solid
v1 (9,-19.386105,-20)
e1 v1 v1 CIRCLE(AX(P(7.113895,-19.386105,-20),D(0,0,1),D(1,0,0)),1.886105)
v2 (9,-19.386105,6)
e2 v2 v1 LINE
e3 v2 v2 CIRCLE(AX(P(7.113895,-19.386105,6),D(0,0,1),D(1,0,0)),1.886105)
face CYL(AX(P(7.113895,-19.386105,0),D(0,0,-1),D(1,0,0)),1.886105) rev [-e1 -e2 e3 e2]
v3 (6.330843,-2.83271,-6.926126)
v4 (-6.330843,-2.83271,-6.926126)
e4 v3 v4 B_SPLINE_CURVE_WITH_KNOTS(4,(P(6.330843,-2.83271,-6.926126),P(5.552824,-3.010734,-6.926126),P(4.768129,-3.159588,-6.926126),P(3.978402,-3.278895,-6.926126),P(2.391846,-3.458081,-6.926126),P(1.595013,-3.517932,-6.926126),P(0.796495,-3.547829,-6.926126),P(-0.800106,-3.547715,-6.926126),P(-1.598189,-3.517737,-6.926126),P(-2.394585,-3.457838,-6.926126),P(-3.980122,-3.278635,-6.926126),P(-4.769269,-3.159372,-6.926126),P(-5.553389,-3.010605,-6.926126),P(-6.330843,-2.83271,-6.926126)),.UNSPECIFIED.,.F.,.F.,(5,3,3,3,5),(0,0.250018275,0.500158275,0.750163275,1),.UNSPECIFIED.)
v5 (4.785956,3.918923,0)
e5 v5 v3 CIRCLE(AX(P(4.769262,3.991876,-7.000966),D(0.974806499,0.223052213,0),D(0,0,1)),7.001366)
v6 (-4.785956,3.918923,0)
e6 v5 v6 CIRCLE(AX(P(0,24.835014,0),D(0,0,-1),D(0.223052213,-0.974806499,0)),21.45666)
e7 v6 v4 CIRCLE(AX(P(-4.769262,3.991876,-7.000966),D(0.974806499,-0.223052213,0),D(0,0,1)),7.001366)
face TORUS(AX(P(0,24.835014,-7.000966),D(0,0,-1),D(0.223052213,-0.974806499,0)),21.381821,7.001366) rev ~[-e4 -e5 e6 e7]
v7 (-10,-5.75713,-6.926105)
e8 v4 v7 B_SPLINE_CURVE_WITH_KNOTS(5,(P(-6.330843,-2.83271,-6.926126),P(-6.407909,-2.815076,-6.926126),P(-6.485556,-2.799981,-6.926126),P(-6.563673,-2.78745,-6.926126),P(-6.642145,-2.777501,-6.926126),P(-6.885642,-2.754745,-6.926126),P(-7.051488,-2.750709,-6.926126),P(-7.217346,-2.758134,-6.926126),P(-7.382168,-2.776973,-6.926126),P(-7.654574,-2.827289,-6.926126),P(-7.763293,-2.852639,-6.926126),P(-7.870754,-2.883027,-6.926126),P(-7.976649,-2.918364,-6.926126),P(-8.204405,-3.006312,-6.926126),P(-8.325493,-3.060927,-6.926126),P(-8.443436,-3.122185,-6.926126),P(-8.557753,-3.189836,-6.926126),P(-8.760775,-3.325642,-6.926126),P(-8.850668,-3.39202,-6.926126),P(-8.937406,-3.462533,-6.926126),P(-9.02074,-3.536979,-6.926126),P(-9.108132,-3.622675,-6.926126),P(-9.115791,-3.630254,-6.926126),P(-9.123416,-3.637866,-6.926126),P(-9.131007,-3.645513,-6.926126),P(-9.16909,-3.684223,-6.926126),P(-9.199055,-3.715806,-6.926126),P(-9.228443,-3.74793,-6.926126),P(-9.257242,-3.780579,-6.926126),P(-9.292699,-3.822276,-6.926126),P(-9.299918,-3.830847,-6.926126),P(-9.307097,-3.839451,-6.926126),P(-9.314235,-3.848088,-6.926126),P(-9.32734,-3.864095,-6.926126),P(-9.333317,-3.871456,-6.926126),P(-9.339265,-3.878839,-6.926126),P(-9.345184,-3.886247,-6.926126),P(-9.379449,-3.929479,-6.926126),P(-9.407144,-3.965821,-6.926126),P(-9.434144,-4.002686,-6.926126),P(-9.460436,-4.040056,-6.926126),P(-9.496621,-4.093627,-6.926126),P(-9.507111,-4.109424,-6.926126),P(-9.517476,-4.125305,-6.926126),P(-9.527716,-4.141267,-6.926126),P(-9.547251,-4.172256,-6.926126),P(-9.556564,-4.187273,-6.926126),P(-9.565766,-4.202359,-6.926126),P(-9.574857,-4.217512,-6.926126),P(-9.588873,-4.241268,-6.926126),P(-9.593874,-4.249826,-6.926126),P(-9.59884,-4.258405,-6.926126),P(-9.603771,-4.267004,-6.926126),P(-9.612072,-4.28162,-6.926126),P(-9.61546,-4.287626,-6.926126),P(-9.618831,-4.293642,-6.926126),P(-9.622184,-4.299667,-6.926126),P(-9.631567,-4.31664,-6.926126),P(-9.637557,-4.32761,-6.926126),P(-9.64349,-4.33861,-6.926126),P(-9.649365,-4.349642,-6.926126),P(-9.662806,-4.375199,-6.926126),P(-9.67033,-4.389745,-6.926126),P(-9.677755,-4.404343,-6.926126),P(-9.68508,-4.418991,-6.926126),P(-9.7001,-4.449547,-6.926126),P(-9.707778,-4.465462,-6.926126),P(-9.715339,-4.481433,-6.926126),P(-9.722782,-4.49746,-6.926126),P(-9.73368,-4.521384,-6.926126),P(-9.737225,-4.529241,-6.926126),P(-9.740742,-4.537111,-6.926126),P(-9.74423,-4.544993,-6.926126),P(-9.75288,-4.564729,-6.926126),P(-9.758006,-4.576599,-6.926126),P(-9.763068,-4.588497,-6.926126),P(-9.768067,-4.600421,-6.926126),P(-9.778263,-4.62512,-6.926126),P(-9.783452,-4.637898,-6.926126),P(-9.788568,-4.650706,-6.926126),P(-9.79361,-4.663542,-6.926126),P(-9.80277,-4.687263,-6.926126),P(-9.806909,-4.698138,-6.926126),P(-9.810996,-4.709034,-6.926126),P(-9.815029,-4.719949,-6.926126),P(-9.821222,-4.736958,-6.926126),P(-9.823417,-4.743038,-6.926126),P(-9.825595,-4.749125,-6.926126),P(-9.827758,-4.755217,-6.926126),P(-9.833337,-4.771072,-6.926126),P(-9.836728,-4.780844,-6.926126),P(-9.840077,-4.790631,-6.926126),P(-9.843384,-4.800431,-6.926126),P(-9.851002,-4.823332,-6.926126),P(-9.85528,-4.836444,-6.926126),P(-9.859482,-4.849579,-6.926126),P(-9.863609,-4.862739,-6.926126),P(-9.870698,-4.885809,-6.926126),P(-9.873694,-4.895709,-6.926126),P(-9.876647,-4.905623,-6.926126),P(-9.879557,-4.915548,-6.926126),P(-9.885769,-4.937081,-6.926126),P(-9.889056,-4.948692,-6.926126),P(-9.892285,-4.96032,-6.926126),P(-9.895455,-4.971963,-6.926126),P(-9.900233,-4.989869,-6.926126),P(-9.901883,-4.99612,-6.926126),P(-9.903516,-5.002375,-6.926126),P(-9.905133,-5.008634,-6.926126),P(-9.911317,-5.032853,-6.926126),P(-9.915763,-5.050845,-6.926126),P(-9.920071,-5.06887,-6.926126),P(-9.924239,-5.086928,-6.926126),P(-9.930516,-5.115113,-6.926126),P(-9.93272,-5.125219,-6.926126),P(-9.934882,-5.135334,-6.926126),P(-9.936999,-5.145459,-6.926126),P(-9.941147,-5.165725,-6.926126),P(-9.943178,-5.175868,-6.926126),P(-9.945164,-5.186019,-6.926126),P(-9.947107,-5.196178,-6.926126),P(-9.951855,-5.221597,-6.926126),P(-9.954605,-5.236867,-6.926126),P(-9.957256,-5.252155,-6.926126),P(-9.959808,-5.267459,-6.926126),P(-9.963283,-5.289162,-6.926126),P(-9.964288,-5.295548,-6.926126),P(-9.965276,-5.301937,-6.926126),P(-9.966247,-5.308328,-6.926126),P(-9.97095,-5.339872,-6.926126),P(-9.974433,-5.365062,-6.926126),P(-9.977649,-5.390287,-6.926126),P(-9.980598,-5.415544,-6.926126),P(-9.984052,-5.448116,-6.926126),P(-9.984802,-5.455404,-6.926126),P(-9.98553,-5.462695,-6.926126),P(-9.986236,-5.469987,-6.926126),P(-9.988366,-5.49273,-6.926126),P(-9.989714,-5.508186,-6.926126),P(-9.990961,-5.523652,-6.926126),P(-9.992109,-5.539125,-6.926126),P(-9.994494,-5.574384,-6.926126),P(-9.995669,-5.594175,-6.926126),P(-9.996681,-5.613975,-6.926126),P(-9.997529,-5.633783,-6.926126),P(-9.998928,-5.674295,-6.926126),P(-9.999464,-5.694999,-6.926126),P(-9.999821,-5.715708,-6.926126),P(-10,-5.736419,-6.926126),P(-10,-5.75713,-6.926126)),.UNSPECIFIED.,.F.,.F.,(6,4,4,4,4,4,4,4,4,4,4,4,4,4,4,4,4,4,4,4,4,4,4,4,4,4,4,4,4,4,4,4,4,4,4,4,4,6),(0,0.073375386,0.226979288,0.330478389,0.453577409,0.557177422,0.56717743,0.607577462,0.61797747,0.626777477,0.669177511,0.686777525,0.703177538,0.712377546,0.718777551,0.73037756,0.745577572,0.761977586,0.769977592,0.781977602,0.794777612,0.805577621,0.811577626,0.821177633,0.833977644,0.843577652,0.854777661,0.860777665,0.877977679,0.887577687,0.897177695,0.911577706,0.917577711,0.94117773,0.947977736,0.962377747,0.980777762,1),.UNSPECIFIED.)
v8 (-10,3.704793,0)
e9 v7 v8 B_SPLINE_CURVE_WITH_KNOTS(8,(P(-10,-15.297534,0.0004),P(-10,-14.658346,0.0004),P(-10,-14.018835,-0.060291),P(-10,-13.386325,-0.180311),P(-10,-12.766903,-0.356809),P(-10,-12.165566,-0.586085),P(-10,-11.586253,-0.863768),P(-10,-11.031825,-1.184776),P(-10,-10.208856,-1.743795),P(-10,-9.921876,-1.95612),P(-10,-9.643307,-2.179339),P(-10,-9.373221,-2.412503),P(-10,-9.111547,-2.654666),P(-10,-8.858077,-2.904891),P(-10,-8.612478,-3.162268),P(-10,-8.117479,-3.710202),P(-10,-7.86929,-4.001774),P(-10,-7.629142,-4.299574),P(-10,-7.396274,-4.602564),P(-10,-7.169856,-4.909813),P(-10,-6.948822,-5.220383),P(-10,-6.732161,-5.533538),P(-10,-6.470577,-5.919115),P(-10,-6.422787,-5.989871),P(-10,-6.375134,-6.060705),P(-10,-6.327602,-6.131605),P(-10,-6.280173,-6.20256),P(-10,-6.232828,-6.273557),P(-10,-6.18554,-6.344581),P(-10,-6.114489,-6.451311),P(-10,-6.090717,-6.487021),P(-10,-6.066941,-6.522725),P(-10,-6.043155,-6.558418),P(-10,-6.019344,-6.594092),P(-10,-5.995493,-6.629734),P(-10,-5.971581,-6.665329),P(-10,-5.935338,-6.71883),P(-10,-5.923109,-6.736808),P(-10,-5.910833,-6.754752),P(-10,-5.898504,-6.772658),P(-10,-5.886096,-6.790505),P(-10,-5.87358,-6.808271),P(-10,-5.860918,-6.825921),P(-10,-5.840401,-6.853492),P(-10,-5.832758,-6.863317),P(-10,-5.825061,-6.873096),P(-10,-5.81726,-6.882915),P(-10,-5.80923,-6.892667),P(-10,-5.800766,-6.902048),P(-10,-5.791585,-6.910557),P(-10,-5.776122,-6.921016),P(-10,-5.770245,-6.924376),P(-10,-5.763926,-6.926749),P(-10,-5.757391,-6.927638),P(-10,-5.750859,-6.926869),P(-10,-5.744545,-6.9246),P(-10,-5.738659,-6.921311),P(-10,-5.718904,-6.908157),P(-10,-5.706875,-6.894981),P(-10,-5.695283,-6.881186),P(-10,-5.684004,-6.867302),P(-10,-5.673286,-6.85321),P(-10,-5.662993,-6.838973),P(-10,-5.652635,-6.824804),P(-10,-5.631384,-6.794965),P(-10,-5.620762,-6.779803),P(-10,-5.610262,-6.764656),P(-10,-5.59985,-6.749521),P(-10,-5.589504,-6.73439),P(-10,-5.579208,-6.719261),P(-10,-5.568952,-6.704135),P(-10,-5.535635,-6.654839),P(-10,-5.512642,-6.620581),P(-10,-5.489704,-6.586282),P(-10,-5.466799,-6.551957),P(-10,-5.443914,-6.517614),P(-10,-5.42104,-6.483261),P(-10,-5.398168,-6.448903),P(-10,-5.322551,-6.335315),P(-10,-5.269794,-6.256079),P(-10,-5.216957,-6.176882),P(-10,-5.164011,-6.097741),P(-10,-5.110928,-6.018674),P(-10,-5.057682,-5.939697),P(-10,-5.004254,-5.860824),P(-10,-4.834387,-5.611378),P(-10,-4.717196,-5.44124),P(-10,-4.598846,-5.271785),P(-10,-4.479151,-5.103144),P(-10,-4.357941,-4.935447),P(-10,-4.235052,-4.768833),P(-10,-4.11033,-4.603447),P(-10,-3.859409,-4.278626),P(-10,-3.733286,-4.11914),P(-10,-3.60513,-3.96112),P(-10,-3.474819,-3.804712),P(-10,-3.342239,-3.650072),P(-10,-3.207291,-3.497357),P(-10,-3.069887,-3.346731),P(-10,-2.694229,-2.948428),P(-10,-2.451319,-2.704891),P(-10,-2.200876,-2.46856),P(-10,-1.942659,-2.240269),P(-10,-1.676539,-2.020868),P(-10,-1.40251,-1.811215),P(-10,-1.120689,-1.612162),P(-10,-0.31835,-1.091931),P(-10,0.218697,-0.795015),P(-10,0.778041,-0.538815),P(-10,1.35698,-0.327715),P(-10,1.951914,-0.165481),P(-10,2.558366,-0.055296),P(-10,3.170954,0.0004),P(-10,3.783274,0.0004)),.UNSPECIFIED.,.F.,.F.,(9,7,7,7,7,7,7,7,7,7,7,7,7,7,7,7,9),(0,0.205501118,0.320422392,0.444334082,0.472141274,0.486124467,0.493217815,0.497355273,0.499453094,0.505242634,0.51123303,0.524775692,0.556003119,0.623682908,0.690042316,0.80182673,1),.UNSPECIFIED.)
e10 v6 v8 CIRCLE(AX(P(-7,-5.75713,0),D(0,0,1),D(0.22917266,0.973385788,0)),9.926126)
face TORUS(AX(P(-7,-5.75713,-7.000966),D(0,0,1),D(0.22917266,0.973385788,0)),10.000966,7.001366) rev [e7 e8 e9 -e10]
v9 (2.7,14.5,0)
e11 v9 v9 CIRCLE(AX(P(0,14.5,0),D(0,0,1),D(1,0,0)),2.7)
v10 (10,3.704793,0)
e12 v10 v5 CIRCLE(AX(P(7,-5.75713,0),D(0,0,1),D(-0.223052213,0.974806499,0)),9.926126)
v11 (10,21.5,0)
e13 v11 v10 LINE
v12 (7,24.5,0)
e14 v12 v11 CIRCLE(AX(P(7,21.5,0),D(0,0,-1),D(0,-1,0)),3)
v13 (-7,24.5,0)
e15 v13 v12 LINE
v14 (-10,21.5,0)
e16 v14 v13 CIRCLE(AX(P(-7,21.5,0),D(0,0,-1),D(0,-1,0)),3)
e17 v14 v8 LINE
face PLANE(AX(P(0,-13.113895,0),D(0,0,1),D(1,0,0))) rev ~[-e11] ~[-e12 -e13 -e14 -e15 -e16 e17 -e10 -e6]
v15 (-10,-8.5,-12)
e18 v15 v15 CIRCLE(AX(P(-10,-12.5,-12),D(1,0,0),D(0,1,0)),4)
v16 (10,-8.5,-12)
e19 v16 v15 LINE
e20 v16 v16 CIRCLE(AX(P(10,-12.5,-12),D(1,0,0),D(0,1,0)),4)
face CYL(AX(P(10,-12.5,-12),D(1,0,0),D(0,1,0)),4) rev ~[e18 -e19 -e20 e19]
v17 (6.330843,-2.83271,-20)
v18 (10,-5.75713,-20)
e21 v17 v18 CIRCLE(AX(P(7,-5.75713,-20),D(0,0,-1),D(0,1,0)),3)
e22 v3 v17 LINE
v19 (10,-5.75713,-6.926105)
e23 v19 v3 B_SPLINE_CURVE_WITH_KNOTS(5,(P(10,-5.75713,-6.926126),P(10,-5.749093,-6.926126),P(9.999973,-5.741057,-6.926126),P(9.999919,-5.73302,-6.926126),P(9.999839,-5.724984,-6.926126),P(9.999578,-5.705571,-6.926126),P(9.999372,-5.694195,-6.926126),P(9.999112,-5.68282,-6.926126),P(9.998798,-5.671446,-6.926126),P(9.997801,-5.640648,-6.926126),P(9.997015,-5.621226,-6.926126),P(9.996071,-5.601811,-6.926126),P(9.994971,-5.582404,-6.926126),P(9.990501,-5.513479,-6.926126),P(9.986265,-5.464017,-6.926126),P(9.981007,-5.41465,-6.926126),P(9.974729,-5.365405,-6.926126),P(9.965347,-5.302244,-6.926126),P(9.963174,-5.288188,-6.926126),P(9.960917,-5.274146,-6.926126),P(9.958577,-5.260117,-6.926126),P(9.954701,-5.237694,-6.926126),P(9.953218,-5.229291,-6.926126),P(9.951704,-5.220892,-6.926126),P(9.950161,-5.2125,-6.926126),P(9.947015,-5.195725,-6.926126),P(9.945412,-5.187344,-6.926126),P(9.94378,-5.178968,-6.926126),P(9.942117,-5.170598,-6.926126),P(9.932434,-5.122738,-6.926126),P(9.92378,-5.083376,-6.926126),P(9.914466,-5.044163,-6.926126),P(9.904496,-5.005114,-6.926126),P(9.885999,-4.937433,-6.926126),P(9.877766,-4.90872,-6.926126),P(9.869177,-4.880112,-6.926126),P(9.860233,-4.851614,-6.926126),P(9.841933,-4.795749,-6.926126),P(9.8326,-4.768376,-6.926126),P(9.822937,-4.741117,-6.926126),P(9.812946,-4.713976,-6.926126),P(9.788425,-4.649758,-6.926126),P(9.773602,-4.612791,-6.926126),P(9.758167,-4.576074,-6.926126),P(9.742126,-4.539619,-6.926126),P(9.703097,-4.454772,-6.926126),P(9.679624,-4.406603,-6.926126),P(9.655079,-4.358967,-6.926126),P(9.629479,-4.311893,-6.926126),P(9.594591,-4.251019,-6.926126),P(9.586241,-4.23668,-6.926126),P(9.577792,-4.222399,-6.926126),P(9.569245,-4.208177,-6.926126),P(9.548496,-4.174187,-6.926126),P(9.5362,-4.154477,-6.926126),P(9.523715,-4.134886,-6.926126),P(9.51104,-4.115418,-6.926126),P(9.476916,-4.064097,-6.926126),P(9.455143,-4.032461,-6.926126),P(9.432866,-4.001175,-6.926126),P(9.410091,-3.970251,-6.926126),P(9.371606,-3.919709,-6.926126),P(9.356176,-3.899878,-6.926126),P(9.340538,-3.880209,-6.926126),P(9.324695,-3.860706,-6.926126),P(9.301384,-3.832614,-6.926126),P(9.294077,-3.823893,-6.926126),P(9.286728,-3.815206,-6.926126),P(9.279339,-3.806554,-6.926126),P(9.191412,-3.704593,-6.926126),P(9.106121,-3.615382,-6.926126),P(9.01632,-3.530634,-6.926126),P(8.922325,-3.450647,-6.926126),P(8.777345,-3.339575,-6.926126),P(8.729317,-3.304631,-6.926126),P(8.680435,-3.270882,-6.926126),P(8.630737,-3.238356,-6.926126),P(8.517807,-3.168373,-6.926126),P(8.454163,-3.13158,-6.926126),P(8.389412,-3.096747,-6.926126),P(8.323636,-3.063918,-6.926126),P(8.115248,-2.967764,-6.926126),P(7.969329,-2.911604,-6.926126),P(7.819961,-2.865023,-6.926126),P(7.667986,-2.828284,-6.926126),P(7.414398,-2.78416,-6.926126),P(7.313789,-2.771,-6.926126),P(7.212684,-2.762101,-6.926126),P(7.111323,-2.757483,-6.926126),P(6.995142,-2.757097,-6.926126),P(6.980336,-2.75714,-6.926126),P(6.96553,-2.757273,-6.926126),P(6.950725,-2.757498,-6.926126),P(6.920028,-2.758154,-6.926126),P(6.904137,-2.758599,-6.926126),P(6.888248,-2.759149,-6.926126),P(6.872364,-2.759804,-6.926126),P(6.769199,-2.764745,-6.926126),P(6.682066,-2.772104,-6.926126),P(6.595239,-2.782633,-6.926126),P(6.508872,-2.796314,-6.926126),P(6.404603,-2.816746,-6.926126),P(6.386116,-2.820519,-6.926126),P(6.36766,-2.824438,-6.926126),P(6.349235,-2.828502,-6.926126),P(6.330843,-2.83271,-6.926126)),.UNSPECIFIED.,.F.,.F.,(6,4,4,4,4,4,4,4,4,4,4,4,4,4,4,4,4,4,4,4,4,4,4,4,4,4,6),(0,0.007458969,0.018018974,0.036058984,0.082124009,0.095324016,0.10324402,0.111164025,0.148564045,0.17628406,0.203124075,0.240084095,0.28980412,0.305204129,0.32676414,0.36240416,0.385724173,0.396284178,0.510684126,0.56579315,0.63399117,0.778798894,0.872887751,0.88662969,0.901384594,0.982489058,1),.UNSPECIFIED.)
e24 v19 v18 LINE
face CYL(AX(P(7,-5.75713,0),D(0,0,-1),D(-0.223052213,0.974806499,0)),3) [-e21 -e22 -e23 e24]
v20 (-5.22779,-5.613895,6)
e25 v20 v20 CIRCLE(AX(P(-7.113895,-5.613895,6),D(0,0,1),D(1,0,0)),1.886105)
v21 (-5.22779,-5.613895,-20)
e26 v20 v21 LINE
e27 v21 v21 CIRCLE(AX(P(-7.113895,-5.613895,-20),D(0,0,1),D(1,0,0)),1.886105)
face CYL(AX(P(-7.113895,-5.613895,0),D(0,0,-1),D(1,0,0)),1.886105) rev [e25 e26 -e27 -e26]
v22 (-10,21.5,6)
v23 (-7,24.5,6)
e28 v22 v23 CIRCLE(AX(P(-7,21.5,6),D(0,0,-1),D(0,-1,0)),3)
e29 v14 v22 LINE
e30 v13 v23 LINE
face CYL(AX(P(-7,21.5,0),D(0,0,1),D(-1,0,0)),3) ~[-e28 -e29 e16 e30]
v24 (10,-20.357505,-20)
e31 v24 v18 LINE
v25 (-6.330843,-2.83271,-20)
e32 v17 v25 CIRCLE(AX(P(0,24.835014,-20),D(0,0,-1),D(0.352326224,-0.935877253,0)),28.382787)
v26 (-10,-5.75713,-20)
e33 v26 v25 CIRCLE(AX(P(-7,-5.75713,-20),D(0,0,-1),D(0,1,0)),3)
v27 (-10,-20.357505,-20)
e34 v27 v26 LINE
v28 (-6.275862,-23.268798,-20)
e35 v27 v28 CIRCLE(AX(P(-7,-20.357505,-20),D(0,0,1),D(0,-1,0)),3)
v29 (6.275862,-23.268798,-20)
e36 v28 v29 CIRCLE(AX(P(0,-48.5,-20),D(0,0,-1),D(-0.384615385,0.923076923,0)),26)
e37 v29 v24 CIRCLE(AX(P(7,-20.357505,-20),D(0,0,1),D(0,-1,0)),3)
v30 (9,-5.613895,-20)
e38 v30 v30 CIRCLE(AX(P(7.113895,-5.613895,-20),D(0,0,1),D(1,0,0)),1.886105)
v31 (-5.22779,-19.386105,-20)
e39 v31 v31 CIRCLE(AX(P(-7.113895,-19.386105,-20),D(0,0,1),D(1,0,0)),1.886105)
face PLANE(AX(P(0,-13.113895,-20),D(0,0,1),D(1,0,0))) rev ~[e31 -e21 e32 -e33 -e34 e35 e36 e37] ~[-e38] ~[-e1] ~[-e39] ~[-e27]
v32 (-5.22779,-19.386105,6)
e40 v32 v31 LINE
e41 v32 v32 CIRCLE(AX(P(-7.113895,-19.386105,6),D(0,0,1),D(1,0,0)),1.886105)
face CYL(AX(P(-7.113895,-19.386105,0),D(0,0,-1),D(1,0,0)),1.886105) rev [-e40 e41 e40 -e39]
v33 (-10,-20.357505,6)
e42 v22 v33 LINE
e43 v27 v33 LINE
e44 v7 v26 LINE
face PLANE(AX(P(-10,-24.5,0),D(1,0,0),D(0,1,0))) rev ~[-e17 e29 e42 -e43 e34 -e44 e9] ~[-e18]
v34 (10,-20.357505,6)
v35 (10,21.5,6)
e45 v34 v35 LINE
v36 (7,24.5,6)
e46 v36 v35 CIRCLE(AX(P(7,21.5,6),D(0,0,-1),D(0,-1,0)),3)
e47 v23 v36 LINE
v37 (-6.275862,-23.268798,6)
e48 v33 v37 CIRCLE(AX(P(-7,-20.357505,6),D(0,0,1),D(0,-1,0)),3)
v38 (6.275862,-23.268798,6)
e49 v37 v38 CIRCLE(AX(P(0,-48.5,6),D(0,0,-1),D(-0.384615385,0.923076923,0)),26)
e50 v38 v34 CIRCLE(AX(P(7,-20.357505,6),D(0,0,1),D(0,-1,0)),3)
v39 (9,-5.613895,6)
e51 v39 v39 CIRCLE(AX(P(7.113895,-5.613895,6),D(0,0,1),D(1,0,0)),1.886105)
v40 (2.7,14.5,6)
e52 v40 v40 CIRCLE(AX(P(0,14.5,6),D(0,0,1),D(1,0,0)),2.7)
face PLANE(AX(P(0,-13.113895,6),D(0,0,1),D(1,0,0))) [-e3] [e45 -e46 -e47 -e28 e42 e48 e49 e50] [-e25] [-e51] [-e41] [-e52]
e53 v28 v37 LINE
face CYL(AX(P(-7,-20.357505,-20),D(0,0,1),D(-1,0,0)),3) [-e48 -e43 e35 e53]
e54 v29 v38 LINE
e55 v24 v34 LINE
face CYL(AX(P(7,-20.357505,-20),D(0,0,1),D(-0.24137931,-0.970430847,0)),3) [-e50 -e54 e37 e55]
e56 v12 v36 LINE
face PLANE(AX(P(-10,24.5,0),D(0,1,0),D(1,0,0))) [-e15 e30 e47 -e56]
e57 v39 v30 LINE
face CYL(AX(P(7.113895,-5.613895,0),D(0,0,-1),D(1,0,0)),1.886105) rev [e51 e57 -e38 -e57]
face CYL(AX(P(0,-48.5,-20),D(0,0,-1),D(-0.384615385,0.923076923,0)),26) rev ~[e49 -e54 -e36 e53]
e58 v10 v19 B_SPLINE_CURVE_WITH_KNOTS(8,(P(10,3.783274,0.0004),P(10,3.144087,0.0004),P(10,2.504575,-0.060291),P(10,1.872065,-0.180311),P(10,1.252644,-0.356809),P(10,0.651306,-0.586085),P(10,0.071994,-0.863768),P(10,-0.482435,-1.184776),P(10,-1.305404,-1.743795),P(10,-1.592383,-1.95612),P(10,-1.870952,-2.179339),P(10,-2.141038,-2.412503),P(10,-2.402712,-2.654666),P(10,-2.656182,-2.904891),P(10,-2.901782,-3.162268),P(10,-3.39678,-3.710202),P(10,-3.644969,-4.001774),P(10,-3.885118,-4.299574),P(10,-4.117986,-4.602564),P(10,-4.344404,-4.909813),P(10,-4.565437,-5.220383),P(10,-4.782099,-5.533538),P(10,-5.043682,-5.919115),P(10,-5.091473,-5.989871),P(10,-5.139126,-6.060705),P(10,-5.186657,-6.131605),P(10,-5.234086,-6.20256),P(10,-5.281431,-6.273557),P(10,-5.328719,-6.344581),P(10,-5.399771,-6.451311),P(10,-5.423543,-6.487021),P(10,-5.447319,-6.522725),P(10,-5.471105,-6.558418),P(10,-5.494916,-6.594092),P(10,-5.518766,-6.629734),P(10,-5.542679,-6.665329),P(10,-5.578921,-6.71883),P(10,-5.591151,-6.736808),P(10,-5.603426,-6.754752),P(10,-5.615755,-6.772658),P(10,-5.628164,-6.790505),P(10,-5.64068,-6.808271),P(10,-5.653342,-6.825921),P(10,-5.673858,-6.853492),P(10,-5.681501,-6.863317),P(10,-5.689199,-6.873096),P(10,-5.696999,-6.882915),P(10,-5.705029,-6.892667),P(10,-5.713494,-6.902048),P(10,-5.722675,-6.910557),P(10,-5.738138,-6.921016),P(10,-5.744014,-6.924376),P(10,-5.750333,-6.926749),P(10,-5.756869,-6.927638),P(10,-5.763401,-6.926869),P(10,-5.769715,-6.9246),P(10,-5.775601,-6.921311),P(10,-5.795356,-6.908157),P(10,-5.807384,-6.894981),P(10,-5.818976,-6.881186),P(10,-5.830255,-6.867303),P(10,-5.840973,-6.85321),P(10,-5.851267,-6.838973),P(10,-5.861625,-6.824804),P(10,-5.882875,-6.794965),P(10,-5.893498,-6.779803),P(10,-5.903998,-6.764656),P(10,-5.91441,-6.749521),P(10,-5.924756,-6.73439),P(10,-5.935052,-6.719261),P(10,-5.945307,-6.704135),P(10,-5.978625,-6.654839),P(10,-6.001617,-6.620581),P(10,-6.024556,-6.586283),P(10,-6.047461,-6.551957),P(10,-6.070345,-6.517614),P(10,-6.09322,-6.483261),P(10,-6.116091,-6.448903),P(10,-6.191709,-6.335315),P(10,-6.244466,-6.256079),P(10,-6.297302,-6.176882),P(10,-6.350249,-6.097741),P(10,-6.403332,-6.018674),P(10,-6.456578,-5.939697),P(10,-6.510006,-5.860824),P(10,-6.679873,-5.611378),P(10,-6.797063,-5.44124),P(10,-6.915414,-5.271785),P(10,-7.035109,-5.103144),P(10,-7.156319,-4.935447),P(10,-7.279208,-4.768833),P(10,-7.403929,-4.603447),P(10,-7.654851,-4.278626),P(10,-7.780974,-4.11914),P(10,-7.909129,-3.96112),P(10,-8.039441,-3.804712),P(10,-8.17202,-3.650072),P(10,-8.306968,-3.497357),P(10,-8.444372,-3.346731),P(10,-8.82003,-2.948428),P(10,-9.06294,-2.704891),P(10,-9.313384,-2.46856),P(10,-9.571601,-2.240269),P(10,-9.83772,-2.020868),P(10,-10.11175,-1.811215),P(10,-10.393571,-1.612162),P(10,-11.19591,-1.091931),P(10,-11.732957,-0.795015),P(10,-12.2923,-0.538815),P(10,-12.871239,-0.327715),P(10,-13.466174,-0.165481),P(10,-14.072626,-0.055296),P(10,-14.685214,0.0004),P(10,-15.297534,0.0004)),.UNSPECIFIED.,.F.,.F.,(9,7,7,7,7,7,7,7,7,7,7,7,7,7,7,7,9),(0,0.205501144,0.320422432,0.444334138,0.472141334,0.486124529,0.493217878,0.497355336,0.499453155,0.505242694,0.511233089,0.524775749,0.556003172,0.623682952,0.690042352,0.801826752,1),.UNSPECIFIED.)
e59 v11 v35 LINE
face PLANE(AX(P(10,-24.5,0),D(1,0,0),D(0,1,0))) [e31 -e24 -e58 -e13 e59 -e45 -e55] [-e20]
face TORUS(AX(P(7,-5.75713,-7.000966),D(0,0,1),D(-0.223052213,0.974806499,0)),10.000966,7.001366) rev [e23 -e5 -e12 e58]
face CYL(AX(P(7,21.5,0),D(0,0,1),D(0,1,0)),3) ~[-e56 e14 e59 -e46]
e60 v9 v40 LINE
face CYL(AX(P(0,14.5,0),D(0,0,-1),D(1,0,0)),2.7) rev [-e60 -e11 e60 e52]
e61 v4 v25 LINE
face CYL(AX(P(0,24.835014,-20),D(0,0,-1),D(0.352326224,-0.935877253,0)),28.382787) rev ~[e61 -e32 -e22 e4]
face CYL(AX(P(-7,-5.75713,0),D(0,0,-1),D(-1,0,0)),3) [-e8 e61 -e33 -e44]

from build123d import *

# Parameters (mm, degrees)
F0_W         = 20
F0_H         = 22.7722101178
F0_R         = 1.8861050589
F0_H_2       = 26.2277898822
F0_R_2       = 2.7
F1_DEPTH     = 6
F2_DEPTH     = 20
F3_R         = 4
F4_DEPTH     = 25
F6_DEPTH     = 20
F7_DEPTH     = 26.001
F8_R         = 3
F9_T2_ANGLE  = 25.7767353783
F9_T6_ANGLE  = 359.64
F9_T11_ANGLE = 359.64


# Not quite as in the source:
# - a fillet or chamfer that OpenCascade refuses, or shapes differently, is made with other operations: its cross-section is extruded or revolved along the edge and cut away or added


with BuildPart() as f1:
    # F0 (on Top) → F1 (new body)
    with BuildSketch(Plane.XY):
        with Locations((0, -13.1138949411)):
            Rectangle(F0_W, F0_H)
        with Locations((-7.1138949411, -19.3861050589)):
            Circle(F0_R, mode=Mode.SUBTRACT)
        with Locations((-7.1138949411, -5.6138949411)):
            Circle(F0_R, mode=Mode.SUBTRACT)
        with Locations((7.1138949411, -19.3861050589)):
            Circle(F0_R, mode=Mode.SUBTRACT)
        with Locations((7.1138949411, -5.6138949411)):
            Circle(F0_R, mode=Mode.SUBTRACT)
        with Locations((0, 11.3861050589)):
            Rectangle(F0_W, F0_H_2)
        with Locations((0, 14.5)):
            Circle(F0_R_2, mode=Mode.SUBTRACT)
    extrude(amount=F1_DEPTH)

    # F0 (on Top) → F2 (join)
    with BuildSketch(Plane.XY):
        with Locations((0, -13.1138949411)):
            Rectangle(F0_W, F0_H)
        with Locations((-7.1138949411, -19.3861050589)):
            Circle(F0_R, mode=Mode.SUBTRACT)
        with Locations((-7.1138949411, -5.6138949411)):
            Circle(F0_R, mode=Mode.SUBTRACT)
        with Locations((7.1138949411, -19.3861050589)):
            Circle(F0_R, mode=Mode.SUBTRACT)
        with Locations((7.1138949411, -5.6138949411)):
            Circle(F0_R, mode=Mode.SUBTRACT)
    extrude(amount=-F2_DEPTH)

    # F3 (on face) → F4 (cut)
    with BuildSketch(Plane.YZ.offset(10)):
        with Locations((-12.5, -12)):
            Circle(F3_R)
    extrude(amount=-F4_DEPTH, mode=Mode.SUBTRACT)

    # F5 (on face) → F6 (cut, through all)
    with BuildSketch(Plane(origin=(0, 0, -20), x_dir=(1, 0, 0), z_dir=(0, 0, -1))):
        with BuildLine():
            Line((-10, 1.7277898822), (10, 1.7277898822))
            ThreePointArc((10, 1.7277898822), (0, 3.5477721311), (-10, 1.7277898822))
        make_face()
    extrude(amount=-F6_DEPTH, mode=Mode.SUBTRACT)

    # F5 (on face) → F7 (cut, through all)
    with BuildSketch(Plane(origin=(0, 0, -20), x_dir=(1, 0, 0), z_dir=(0, 0, -1))):
        with BuildLine():
            ThreePointArc((-10, 24.5), (0, 22.5), (10, 24.5))
            Line((10, 24.5), (-10, 24.5))
        make_face()
    extrude(amount=-F7_DEPTH, mode=Mode.SUBTRACT)

    # F8
    f8_edges = [f1.edges().sort_by_distance(p)[0] for p in [
        (-10, 24.5, 3),
        (10, 24.5, 3),
        (10, -24.5, -7),
        (-10, -24.5, -7),
        (-10, -1.72779, -10),
        (10, -1.72779, -10),
    ]]
    fillet(f8_edges, radius=F8_R)

    # F9: fillet of radius 7 on 1 edges, made by hand

    # F9_s1 → F9_t2 (revolve)
    with BuildSketch(Plane(origin=(5.3999454097, 1.2355988362, 0), x_dir=(0, 0, 1), z_dir=(0.9748064988, 0.2230522133, 0))):
        with BuildLine():
            ThreePointArc((0.0004, -2.8275125891), (-2.0502525317, 2.1232005646), (-7.0009656854, 4.1738530963))
            Line((-7.0009656854, 4.1738530963), (-7.0009656854, 4.8739896648))
            ThreePointArc((-7.0009656854, 4.8739896648), (-3.5004828427, 4.8735896648), (0, 4.8735896648))
            Line((0, 4.8735896648), (0.7001365685, 4.1734530963))
            ThreePointArc((0.7001365685, 4.1734530963), (0.7001365685, 0.6729702536), (0.7005365685, -2.8275125891))
            Line((0.7005365685, -2.8275125891), (0.0004, -2.8275125891))
        make_face()
    revolve(axis=Axis((0, 24.8350144179, 0), (0, 0, -1)), revolution_arc=F9_T2_ANGLE)


with BuildPart() as f9_tool4:
    # F9_s5 → F9_t6 (revolve)
    with BuildSketch(Plane(origin=(5.3999454097, 1.2355988362, 0), x_dir=(0, 0, 1), z_dir=(-0.9748064988, -0.2230522133, 0))):
        with BuildLine():
            ThreePointArc((0.0004, 2.8275125891), (-2.0502525317, -2.1232005646), (-7.0009656854, -4.1738530963))
            Line((-7.0009656854, -4.1738530963), (-7.0009656854, -4.8739896648))
            ThreePointArc((-7.0009656854, -4.8739896648), (-3.5004828427, -4.8735896648), (0, -4.8735896648))
            Line((0, -4.8735896648), (0.7001365685, -4.1734530963))
            ThreePointArc((0.7001365685, -4.1734530963), (0.7001365685, -0.6729702536), (0.7005365685, 2.8275125891))
            Line((0.7005365685, 2.8275125891), (0.0004, 2.8275125891))
        make_face()
    revolve(axis=Axis((7, -5.757129861, 0), (0, 0, -1)), revolution_arc=F9_T6_ANGLE)

    split(bisect_by=Plane.YZ.offset(10), keep=Keep.BOTTOM)


with BuildPart() as f1_1:
    add(f1.part)

    # F9_t3: union F9_tool4
    add(f9_tool4.part)


with BuildPart() as f9_tool9:
    # F9_s10 → F9_t11 (revolve)
    with BuildSketch(Plane(origin=(-5.348096652, 1.2591487889, 0), x_dir=(0, 0, 1), z_dir=(-0.9733857878, 0.22917266, 0))):
        with BuildLine():
            ThreePointArc((0.0004, 2.79284868), (-2.0502525317, -2.1578644738), (-7.0009656854, -4.2085170055))
            Line((-7.0009656854, -4.2085170055), (-7.0009656854, -4.908653574))
            ThreePointArc((-7.0009656854, -4.908653574), (-3.5004828427, -4.908253574), (0, -4.908253574))
            Line((0, -4.908253574), (0.7001365685, -4.2081170055))
            ThreePointArc((0.7001365685, -4.2081170055), (0.7001365685, -0.7076341628), (0.7005365685, 2.79284868))
            Line((0.7005365685, 2.79284868), (0.0004, 2.79284868))
        make_face()
    revolve(axis=Axis((-7, -5.757129861, 0), (0, 0, -1)), revolution_arc=F9_T11_ANGLE)

    split(bisect_by=Plane.YZ.offset(-10), keep=Keep.TOP)


with BuildPart() as f1_2:
    add(f1_1.part)

    # F9_t8: union F9_tool9
    add(f9_tool9.part)


solid = f1_2.part
